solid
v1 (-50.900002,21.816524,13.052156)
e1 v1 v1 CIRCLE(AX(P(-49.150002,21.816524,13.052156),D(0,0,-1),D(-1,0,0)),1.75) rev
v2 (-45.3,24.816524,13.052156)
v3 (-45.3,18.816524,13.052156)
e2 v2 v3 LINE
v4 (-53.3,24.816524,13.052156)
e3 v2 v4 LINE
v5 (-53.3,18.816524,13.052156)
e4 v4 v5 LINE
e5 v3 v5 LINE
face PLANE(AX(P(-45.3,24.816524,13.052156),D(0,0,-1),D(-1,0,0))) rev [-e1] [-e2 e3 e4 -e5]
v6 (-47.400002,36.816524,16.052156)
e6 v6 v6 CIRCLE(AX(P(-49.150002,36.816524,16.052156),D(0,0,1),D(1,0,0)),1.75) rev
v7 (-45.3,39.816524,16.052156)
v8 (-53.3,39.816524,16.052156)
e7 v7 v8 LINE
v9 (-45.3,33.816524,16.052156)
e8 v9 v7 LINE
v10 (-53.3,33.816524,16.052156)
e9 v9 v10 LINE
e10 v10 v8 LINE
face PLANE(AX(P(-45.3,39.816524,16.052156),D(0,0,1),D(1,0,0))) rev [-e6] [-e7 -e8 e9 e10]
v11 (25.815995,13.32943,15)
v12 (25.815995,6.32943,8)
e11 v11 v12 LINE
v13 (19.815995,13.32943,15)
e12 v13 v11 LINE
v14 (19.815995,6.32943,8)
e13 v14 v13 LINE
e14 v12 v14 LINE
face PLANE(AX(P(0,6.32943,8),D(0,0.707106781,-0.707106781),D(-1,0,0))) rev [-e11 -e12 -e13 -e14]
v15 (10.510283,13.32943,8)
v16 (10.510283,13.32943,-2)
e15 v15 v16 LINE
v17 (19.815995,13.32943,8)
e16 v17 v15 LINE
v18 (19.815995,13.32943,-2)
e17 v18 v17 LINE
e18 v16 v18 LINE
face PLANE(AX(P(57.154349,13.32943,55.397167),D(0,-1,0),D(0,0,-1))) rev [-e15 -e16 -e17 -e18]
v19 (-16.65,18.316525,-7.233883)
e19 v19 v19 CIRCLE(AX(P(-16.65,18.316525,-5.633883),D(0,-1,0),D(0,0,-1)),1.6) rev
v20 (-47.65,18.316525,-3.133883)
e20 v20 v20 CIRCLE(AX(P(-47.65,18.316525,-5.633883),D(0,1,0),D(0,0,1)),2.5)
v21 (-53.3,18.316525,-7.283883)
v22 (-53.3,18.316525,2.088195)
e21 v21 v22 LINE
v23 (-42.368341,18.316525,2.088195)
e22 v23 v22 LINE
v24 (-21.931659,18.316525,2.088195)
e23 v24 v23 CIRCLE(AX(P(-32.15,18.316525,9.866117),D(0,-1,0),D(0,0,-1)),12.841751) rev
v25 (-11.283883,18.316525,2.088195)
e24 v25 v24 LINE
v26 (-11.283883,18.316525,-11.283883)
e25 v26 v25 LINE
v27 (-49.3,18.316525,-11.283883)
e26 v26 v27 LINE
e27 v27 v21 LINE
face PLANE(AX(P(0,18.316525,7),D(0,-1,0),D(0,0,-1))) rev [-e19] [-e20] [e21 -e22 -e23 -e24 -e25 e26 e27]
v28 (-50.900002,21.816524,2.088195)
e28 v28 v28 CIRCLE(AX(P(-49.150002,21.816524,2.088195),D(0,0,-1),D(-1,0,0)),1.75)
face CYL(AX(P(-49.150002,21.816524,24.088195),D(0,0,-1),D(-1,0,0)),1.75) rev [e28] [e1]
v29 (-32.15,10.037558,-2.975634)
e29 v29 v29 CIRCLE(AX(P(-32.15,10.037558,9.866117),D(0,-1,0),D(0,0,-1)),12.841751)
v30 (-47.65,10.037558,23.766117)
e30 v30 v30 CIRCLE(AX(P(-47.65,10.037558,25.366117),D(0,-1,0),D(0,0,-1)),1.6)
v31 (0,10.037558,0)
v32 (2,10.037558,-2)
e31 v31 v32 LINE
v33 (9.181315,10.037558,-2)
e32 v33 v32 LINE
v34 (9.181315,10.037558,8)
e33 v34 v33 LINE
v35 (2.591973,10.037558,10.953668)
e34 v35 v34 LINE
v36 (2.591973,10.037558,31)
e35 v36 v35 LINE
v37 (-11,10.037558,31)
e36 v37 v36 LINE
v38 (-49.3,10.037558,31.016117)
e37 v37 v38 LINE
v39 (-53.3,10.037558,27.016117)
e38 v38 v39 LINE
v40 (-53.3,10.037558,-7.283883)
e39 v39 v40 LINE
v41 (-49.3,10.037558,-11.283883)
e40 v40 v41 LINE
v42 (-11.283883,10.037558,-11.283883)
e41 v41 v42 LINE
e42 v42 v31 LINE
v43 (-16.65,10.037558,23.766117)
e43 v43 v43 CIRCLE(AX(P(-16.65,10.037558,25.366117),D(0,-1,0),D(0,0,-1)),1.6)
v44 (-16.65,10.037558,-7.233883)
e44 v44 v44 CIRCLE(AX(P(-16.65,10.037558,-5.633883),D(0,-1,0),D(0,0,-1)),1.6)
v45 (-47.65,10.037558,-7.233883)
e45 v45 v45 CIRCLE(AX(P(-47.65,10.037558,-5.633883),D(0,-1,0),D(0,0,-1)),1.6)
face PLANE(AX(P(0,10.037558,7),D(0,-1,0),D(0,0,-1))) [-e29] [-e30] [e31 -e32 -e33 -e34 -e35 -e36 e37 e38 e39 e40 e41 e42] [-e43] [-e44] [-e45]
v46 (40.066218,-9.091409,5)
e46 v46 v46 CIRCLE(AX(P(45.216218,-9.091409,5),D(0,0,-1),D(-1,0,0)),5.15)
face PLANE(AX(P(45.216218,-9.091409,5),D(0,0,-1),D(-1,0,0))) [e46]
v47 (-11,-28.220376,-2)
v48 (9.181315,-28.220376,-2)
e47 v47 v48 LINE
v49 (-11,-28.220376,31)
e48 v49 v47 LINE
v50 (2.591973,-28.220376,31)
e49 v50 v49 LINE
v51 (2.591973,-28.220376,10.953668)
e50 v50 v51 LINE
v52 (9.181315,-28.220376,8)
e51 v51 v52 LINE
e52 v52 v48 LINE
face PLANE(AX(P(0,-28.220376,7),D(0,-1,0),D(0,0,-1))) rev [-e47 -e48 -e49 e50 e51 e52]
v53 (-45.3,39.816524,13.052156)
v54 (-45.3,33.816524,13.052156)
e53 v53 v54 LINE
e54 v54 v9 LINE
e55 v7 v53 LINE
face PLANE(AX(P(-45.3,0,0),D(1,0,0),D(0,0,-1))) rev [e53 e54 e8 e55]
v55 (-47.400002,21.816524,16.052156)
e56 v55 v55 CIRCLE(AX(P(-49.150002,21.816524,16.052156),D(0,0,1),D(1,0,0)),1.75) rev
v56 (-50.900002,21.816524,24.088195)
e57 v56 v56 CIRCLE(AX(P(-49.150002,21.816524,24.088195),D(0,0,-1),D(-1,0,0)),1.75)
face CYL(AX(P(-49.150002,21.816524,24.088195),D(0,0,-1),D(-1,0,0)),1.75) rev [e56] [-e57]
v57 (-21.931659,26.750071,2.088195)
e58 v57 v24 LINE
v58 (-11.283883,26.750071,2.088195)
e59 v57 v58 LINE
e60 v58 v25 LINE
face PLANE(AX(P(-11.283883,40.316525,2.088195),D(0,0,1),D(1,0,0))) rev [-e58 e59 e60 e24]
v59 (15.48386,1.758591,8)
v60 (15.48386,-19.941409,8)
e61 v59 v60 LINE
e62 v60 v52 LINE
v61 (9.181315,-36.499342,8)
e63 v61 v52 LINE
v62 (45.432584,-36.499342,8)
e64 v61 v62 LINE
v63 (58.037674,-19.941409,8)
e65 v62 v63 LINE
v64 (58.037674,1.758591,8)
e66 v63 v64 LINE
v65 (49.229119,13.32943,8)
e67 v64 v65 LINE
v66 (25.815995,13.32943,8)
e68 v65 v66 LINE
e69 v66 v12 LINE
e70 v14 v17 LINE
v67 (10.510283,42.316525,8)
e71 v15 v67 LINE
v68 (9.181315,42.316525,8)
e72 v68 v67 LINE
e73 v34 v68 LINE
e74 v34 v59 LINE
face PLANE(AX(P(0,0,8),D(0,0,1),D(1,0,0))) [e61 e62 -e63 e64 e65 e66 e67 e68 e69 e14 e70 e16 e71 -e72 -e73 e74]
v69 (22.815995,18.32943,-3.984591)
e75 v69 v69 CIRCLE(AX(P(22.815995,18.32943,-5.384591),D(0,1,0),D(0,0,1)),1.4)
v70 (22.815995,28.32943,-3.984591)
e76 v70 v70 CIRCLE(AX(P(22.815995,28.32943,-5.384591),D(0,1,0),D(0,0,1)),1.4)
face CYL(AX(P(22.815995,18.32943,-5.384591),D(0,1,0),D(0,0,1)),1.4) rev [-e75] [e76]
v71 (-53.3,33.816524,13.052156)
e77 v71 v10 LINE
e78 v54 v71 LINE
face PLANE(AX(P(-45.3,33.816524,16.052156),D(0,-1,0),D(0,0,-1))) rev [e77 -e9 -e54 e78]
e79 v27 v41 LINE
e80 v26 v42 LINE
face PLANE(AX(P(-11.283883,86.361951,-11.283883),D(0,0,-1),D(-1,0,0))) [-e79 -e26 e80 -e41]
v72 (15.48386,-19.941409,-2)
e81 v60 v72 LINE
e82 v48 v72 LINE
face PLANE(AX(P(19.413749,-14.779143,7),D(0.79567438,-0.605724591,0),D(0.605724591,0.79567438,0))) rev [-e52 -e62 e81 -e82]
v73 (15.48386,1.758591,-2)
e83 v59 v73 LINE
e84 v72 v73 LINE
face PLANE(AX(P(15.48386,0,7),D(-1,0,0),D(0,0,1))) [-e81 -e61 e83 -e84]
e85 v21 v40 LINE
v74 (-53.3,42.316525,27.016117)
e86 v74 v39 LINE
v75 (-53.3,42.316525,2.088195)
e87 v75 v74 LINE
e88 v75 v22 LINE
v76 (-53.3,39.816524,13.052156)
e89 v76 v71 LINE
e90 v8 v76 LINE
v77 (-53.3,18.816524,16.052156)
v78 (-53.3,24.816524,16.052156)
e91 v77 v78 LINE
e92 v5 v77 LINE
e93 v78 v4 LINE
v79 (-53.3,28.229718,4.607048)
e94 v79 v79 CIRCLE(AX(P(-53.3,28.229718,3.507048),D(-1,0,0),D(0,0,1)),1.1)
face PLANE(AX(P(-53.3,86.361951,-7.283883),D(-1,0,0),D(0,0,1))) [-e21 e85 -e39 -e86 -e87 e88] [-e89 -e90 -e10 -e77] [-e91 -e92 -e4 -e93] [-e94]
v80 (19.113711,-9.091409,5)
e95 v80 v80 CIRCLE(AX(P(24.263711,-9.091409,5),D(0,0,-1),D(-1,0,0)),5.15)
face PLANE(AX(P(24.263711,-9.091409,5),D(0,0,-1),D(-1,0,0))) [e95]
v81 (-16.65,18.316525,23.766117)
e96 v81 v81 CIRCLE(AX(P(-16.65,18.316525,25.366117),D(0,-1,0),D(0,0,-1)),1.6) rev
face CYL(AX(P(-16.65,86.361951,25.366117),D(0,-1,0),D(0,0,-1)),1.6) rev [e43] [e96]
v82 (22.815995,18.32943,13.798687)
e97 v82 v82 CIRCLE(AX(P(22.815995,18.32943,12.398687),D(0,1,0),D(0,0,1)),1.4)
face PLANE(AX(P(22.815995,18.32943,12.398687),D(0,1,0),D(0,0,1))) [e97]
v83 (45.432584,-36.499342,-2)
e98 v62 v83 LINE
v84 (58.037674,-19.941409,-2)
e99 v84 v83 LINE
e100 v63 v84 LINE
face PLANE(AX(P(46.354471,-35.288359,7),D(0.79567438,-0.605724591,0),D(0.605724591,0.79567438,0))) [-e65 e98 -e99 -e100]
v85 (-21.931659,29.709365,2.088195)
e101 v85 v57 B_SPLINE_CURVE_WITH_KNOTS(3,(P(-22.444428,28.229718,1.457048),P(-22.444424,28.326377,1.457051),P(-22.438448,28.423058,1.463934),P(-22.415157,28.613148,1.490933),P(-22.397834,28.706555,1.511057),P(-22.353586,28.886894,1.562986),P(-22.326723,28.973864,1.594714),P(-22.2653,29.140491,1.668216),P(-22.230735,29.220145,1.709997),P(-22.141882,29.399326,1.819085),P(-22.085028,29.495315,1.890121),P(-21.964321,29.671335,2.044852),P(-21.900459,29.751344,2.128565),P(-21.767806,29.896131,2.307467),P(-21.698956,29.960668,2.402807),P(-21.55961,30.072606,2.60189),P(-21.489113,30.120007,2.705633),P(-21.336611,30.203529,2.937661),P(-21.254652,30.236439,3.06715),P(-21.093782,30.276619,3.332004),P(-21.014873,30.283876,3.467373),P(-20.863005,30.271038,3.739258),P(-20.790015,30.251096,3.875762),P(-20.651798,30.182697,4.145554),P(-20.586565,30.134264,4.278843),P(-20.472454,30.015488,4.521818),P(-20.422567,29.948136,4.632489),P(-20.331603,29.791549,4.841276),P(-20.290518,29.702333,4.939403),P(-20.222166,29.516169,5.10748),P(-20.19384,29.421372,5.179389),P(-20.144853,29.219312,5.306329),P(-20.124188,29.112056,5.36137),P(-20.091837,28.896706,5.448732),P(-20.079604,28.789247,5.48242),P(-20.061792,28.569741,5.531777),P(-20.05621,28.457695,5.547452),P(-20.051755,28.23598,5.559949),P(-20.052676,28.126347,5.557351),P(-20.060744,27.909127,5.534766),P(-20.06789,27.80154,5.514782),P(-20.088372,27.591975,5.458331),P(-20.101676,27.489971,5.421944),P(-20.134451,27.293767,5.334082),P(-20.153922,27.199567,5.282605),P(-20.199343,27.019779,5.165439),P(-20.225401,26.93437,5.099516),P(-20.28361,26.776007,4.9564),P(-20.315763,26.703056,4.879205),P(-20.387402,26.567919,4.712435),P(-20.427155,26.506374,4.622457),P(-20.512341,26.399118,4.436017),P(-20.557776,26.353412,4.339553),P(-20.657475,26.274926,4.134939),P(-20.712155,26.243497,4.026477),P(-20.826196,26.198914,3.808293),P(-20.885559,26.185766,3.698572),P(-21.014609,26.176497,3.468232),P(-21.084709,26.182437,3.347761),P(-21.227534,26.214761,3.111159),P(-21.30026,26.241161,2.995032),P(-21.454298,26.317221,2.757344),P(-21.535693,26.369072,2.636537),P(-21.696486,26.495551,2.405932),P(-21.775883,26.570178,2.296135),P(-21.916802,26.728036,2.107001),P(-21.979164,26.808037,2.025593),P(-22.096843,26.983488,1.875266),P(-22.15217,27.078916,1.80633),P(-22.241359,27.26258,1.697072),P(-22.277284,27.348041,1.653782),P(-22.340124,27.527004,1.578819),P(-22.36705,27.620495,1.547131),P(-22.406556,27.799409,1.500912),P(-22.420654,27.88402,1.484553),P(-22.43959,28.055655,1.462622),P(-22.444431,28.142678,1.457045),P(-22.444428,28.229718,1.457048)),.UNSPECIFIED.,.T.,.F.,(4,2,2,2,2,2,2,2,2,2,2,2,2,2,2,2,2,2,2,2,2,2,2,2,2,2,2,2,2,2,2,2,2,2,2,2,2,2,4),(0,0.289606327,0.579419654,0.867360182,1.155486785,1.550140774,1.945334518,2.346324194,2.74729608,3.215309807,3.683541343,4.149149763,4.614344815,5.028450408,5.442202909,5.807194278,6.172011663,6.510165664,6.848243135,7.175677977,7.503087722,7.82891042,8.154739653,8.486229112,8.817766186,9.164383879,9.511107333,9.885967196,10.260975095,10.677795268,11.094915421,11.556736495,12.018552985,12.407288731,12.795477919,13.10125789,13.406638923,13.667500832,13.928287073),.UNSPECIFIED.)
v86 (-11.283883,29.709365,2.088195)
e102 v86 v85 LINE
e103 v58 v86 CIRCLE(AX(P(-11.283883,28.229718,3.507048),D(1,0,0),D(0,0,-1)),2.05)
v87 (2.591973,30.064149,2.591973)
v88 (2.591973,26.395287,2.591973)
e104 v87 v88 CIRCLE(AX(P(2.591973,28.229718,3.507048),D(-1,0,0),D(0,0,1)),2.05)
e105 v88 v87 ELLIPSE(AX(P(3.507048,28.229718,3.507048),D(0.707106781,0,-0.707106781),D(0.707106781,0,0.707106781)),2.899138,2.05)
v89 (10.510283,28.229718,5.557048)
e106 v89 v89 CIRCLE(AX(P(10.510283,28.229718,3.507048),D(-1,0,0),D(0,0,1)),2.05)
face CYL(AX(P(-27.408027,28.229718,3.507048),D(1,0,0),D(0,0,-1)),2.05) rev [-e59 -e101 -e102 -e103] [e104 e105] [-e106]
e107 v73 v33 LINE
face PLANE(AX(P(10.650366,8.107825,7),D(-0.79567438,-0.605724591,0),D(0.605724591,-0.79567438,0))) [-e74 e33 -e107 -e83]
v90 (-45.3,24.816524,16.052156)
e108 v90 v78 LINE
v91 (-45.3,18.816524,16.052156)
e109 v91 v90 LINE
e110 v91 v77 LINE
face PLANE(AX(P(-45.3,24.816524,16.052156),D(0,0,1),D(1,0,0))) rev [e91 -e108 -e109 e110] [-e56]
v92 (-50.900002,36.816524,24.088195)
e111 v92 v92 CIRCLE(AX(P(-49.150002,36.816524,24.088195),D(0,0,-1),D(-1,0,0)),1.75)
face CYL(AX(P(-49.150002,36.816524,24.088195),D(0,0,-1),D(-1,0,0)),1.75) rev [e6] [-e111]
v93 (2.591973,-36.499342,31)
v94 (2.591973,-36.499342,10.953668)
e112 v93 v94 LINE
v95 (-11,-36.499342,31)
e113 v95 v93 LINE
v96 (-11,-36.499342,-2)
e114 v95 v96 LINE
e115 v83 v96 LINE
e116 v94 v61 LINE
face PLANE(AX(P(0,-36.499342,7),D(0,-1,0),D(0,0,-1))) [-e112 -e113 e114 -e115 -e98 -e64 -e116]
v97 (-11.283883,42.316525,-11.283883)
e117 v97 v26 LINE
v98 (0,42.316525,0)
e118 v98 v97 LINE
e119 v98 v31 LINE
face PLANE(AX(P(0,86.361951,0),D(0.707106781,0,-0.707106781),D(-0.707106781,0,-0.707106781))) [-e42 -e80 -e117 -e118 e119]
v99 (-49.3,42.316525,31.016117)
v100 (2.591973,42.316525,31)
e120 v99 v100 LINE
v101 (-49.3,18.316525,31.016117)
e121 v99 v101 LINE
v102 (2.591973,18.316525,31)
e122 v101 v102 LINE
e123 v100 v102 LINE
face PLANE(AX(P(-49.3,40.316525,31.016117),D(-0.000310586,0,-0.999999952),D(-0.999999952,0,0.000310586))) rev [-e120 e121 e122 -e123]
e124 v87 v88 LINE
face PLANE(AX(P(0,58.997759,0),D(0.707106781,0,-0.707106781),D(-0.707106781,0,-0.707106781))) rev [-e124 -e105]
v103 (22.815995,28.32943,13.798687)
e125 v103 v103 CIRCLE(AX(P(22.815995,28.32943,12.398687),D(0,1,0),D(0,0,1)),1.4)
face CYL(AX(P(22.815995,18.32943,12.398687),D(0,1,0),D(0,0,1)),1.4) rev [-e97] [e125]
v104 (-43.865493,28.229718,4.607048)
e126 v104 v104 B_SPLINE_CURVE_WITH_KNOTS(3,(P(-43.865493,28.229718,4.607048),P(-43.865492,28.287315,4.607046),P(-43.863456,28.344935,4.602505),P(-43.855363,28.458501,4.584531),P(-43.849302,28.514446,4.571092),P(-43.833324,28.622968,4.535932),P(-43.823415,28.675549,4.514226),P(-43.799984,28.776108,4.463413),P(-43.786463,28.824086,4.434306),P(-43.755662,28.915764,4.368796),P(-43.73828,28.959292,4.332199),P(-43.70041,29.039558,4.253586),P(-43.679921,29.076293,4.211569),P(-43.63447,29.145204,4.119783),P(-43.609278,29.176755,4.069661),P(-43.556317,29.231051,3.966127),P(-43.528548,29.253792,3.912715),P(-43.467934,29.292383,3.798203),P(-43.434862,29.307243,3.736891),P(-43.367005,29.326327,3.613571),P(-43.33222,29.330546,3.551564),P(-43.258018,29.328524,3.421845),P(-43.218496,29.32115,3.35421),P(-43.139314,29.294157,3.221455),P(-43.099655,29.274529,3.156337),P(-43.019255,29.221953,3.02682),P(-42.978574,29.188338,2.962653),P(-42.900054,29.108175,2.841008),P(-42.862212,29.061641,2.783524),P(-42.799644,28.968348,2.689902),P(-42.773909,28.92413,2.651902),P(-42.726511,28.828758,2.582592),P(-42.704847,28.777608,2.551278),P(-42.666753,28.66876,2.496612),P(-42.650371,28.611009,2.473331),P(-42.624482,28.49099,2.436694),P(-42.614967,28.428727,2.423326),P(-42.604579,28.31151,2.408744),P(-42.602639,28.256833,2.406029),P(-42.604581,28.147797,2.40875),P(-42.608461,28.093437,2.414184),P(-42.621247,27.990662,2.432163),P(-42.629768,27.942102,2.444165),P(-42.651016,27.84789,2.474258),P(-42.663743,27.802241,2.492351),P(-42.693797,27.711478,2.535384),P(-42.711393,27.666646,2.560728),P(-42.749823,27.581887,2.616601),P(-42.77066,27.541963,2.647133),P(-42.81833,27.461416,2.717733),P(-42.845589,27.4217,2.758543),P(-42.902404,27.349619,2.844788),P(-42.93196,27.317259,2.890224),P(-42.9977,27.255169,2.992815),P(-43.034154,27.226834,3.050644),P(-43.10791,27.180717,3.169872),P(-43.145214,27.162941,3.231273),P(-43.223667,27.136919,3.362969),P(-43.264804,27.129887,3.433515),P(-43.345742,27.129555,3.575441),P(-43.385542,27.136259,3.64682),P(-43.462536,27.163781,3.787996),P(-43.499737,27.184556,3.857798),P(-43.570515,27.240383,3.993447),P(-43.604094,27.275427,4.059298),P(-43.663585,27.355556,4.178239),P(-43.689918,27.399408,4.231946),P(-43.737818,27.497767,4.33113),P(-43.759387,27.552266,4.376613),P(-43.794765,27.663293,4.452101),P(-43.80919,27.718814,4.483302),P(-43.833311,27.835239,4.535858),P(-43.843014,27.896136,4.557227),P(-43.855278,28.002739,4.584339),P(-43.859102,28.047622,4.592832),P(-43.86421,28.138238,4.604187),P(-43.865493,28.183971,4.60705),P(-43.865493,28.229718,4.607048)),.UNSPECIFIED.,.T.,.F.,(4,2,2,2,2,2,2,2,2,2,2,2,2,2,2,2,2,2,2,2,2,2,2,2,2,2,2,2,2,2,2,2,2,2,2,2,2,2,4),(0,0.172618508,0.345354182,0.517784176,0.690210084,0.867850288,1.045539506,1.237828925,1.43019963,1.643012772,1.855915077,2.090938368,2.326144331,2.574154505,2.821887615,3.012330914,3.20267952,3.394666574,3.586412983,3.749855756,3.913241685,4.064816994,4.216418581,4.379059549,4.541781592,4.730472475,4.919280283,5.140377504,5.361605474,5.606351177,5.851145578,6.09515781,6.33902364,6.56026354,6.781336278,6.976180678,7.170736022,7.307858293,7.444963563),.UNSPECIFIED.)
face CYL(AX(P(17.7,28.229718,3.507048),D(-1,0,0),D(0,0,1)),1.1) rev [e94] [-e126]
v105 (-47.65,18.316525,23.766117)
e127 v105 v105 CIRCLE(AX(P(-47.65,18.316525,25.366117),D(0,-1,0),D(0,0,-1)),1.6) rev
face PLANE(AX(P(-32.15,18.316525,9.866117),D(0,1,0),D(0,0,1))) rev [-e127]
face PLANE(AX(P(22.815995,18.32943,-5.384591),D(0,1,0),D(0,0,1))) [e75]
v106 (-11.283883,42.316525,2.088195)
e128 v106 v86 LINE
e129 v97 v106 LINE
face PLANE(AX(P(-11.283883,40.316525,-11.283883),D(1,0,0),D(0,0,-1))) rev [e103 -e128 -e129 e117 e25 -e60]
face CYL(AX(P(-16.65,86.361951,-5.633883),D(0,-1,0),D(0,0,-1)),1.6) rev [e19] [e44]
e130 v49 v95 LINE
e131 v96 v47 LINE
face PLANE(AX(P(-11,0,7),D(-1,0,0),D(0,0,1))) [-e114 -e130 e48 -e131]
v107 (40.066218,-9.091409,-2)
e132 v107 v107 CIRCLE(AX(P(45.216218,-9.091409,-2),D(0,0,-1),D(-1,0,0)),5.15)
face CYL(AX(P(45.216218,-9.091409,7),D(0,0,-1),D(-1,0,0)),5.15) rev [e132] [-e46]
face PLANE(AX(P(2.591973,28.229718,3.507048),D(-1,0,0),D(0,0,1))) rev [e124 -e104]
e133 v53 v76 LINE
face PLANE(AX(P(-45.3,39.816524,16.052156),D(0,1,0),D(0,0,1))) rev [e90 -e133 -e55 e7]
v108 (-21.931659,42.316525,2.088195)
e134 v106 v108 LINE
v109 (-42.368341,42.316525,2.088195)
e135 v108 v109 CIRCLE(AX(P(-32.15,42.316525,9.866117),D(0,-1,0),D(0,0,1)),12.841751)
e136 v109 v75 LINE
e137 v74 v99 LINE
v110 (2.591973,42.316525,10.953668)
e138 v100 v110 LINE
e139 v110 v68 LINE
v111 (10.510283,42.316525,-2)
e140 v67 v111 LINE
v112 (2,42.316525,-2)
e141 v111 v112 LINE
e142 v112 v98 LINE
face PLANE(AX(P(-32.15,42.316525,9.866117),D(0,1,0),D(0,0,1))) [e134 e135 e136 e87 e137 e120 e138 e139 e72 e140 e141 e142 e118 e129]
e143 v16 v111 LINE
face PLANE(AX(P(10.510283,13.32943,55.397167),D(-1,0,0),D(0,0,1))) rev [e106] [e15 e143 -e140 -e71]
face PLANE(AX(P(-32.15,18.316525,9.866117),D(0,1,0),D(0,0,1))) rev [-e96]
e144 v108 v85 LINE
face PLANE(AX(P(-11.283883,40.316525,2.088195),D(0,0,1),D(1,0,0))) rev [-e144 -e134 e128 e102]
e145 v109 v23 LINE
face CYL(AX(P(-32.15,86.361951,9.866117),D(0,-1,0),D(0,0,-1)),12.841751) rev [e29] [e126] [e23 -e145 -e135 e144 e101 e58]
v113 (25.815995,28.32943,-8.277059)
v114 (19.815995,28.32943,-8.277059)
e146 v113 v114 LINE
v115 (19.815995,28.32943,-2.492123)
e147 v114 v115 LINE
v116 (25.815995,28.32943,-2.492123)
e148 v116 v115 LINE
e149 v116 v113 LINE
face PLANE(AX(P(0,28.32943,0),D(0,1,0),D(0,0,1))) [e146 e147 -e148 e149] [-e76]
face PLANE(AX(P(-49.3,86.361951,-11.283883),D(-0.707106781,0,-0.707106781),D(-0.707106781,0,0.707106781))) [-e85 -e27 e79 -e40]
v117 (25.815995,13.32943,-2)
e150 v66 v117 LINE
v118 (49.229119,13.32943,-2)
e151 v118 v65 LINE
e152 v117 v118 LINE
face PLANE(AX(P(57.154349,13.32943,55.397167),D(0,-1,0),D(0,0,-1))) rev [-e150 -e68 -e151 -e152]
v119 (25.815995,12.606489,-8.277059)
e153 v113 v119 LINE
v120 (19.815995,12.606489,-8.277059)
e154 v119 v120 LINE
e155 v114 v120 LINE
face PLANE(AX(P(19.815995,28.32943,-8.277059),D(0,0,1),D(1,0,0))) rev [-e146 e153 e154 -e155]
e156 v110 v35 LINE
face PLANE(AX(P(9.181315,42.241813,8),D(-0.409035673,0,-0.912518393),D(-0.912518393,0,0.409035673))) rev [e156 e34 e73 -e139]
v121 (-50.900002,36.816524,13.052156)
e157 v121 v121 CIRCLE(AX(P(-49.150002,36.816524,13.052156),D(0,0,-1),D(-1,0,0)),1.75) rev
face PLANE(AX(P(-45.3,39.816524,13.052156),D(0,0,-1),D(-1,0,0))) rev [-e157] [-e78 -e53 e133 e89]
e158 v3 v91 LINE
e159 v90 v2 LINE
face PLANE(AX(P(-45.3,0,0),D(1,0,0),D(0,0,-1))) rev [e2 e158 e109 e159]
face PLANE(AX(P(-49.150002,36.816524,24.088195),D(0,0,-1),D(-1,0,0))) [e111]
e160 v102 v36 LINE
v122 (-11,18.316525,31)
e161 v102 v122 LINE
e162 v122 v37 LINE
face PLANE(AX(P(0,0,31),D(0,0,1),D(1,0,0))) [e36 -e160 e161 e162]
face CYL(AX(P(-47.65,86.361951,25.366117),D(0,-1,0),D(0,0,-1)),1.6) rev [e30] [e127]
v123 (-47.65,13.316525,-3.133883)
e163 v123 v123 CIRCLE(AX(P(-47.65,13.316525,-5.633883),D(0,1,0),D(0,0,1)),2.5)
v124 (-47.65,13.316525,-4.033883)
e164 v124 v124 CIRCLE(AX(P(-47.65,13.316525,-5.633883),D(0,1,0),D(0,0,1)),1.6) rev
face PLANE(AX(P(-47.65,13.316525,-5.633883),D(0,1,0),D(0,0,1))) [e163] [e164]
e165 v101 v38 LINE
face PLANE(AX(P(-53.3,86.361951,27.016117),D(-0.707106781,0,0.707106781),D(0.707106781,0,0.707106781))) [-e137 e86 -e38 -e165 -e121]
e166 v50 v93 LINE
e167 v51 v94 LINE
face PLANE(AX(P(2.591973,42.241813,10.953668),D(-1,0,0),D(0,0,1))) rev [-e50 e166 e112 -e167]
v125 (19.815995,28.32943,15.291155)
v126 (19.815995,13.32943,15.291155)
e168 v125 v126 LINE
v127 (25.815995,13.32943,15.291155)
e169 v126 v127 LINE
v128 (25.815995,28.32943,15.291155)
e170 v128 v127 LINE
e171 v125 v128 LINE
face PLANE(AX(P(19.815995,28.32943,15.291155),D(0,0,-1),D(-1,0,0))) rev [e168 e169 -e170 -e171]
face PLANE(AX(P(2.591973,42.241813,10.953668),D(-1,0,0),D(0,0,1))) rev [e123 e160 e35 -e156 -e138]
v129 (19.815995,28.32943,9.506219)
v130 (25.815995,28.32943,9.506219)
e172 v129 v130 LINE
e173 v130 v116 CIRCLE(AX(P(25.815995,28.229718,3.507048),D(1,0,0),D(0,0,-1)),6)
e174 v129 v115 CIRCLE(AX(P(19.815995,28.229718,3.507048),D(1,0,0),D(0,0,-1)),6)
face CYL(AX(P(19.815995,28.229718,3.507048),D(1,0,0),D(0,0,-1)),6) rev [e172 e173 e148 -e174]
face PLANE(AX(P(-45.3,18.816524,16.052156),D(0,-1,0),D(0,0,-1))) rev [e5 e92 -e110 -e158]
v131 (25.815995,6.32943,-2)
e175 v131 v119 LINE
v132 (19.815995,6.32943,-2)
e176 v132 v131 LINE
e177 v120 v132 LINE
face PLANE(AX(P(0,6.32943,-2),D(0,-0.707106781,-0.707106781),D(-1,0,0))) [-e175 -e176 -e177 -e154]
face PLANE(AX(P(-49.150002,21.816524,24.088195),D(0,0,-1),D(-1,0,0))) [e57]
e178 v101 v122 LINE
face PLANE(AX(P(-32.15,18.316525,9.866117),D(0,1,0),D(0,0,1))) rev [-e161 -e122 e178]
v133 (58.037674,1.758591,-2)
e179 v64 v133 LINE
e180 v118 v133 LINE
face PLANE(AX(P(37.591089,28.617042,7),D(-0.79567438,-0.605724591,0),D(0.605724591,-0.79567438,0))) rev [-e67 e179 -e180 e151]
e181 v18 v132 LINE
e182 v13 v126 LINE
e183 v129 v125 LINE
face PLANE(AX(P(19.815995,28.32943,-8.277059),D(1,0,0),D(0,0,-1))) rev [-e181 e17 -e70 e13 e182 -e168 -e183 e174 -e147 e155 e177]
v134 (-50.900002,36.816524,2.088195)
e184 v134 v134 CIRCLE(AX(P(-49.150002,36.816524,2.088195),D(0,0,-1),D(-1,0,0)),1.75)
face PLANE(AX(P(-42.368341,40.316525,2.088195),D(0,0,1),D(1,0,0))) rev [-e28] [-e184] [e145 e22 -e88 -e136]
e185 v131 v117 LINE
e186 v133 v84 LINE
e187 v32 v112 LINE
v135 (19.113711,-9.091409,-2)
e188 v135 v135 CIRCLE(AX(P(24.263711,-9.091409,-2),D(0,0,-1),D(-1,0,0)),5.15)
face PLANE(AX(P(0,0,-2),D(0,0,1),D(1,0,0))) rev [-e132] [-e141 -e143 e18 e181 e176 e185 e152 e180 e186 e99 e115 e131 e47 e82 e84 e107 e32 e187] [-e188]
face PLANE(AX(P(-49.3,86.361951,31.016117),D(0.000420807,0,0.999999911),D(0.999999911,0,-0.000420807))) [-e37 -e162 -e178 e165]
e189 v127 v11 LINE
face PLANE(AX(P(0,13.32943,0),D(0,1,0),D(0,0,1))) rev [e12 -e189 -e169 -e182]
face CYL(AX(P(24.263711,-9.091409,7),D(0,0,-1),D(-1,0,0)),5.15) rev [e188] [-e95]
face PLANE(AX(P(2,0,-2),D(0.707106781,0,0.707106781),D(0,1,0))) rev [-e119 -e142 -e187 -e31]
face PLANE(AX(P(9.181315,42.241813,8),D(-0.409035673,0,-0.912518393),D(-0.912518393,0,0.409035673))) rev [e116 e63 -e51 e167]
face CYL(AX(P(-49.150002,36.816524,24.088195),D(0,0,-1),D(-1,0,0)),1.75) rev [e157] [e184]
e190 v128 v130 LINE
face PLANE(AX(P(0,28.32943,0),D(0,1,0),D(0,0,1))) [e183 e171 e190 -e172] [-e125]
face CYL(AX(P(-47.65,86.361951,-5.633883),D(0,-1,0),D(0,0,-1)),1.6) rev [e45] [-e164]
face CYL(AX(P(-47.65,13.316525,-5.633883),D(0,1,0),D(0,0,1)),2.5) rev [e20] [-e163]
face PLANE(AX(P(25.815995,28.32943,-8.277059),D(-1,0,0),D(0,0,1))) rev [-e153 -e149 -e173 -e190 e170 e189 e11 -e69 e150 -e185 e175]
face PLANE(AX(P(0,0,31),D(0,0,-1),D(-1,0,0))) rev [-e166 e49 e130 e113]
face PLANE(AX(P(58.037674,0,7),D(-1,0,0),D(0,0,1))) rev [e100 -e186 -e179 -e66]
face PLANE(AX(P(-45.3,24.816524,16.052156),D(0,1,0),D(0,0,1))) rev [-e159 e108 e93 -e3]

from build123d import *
from build123d.topology import SkipClean

# Parameters (mm, degrees)
SKICA1_R                  = 5.15
P_IDAT_VYSUNUT_M1_DEPTH   = 7
P_IDAT_VYSUNUT_M6_DEPTH   = 1
SKICA10_W                 = 20.181315219
SKICA10_H                 = 8.27896674
P_IDAT_VYSUNUT_M7_DEPTH   = 23
ODEBRAT_START             = -54.815867
ODEBRAT_VYSUNUT_M3_DEPTH  = 54.815867
SKICA12_R                 = 12.841751151
SKICA12_R_2               = 1.6
P_IDAT_VYSUNUT_M8_DEPTH   = 8.27896674
SKICA13_R                 = 2.5
ODEBRAT_VYSUNUT_M4_DEPTH  = 5
P_IDAT_VYSUNUT_M9_DEPTH   = 22
SKICA15_R                 = 1.749999821
ODEBRAT_VYSUNUT_M5_DEPTH  = 22
SKICA18_W                 = 3
SKICA18_H                 = 6
ODEBRAT_VYSUNUT_M6_DEPTH  = 8
P_IDAT_VYSUNUT_M10_DEPTH  = 2
SKICA20_R                 = 1.1
ODEBRAT_VYSUNUT_M7_DEPTH  = 51
SKICA21_R                 = 2.05
ODEBRAT_VYSUNUT_M8_DEPTH  = 30
P_IDAT_START              = 2
SKICA22_R                 = 5.15
P_IDAT_VYSUNUT_M11_DEPTH  = 2
SKICA23_R                 = 5.15
P_IDAT_VYSUNUT_M12_DEPTH  = 2
ZKOSEN_1_SIZE             = 2
SKICA24_W                 = 46.644065318
SKICA24_H                 = 8.415614868
ODEBRAT_VYSUNUT_M9_DEPTH  = 10
P_IDAT_VYSUNUT_M13_DEPTH  = 24
SKICA26_W                 = 6
SKICA26_H                 = 23.568213348
P_IDAT_VYSUNUT_M14_DEPTH  = 15
SKICA27_R                 = 6
ODEBRAT_VYSUNUT_M10_DEPTH = 6
ZKOSEN_2_SIZE             = 7
SKICA28_R                 = 1.4
ODEBRAT_VYSUNUT_M11_DEPTH = 10
ODEBRAT_START_2           = -10
SKICA29_R                 = 2.05
ODEBRAT_VYSUNUT_M12_DEPTH = 10


# Some blends are built 0.0001 mm under size
with BuildPart() as part:
    # Skica1 → Přidat vysunutím1 (new body)
    with BuildSketch(Plane.XY):
        Polygon((15.483860416, -19.94140889), (15.483860416, 1.75859111), (9.181315219, 10.03755785), (-11, 10.03755785), (-11, 18.31652459), (2.878770021, 18.31652459), (45.432583607, 18.31652459), (58.037674001, 1.75859111), (58.037674001, -19.94140889), (45.432583607, -36.49934237), (2.878770021, -36.49934237), (-11, -36.49934237), (-11, -28.22037563), (9.181315219, -28.22037563), align=None)
        with Locations((45.216218307, -9.09140889)):
            Circle(SKICA1_R, mode=Mode.SUBTRACT)
        with Locations((24.263711451, -9.09140889)):
            Circle(SKICA1_R, mode=Mode.SUBTRACT)
    extrude(amount=P_IDAT_VYSUNUT_M1_DEPTH)

    # Skica9 → Přidat vysunutím6 (add)
    with BuildSketch(Plane.XY.offset(7)):
        Polygon((45.432583607, -36.49934237), (58.037674001, -19.94140889), (58.037674001, 1.75859111), (45.432583607, 18.31652459), (-11, 18.31652459), (-11, 10.03755785), (9.181315219, 10.03755785), (15.483860416, 1.75859111), (15.483860416, -19.94140889), (9.181315219, -28.22037563), (-11, -28.22037563), (-11, -36.49934237), align=None)
    extrude(amount=P_IDAT_VYSUNUT_M6_DEPTH)

    # Skica10 → Přidat vysunutím7 (add)
    with BuildSketch(Plane.XY.offset(8)):
        with Locations((-0.90934239, -32.359859)):
            Rectangle(SKICA10_W, SKICA10_H)
        with Locations((-0.90934239, 14.17704122)):
            Rectangle(SKICA10_W, SKICA10_H)
    extrude(amount=P_IDAT_VYSUNUT_M7_DEPTH)

    # Skica11 → Odebrat vysunutím3 (cut)
    with BuildSketch(Plane.XZ.offset(36.49934237).offset(ODEBRAT_START)):
        Polygon((9.181315219, 8), (2.591972534, 10.953667824), (2.591972534, 31), (9.181315219, 31), align=None)
    extrude(amount=ODEBRAT_VYSUNUT_M3_DEPTH, mode=Mode.SUBTRACT)

    # Skica12 → Přidat vysunutím8 (add)
    with BuildSketch(Plane.XZ.offset(-10.03755785)):
        Polygon((0, 0), (-11.283883078, -11.283883078), (-49.3, -11.283883078), (-53.3, -7.283883078), (-53.3, 27.016116922), (-49.3, 31.016116922), (-11, 31), (-11, 0), align=None)
        with Locations(Location((-32.15, 9.866116922, 0), (0, 0, 270))):
            Circle(SKICA12_R, mode=Mode.SUBTRACT)
        with Locations(Location((-47.65, 25.366116922, 0), (0, 0, 270))):
            Circle(SKICA12_R_2, mode=Mode.SUBTRACT)
        with Locations(Location((-16.65, 25.366116922, 0), (0, 0, 270))):
            Circle(SKICA12_R_2, mode=Mode.SUBTRACT)
        with Locations(Location((-16.65, -5.633883078, 0), (0, 0, 270))):
            Circle(SKICA12_R_2, mode=Mode.SUBTRACT)
        with Locations(Location((-47.65, -5.633883078, 0), (0, 0, 270))):
            Circle(SKICA12_R_2, mode=Mode.SUBTRACT)
    extrude(amount=-P_IDAT_VYSUNUT_M8_DEPTH)

    # Skica13 → Odebrat vysunutím4 (cut)
    with BuildSketch(Plane(origin=(0, 18.31652459, 0), x_dir=(1, 0, 0), z_dir=(0, 1, 0))):
        with Locations(Location((-47.65, 5.633883078, 0), (0, 0, 270))):
            Circle(SKICA13_R)
    extrude(amount=-ODEBRAT_VYSUNUT_M4_DEPTH, mode=Mode.SUBTRACT)

    # Skica14 → Přidat vysunutím9 (add)
    with BuildSketch(Plane(origin=(0, 18.31652459, 0), x_dir=(1, 0, 0), z_dir=(0, 1, 0))):
        with BuildLine():
            Line((-42.368341227, -2.088194628), (-53.3, -2.088194628))
            Line((-53.3, -2.088194628), (-53.3, -27.016116922))
            Line((-53.3, -27.016116922), (-49.3, -31.016116922))
            Line((-49.3, -31.016116922), (2.591972534, -31))
            Line((2.591972534, -31), (2.591972534, -10.953667824))
            Line((2.591972534, -10.953667824), (2.591972534, -2.591972534))
            Line((2.591972534, -2.591972534), (-11.283883078, 11.283883078))
            Line((-11.283883078, 11.283883078), (-11.283883078, -2.088194628))
            Line((-11.283883078, -2.088194628), (-21.931658773, -2.088194628))
            ThreePointArc((-21.931658773, -2.088194628), (-32.15, -22.707868073), (-42.368341227, -2.088194628))
        make_face()
    extrude(amount=P_IDAT_VYSUNUT_M9_DEPTH)

    # Skica15 → Odebrat vysunutím5 (cut)
    with BuildSketch(Plane(origin=(0, 0, 2.088194628), x_dir=(-1, 0, 0), z_dir=(0, 0, -1))):
        with Locations((49.150002214, 36.816524362)):
            Circle(SKICA15_R)
        with Locations((49.150002214, 21.816524232)):
            Circle(SKICA15_R)
    extrude(amount=-ODEBRAT_VYSUNUT_M5_DEPTH, mode=Mode.SUBTRACT)

    # Skica18 → Odebrat vysunutím6 (cut)
    with BuildSketch(Plane.ZY.offset(53.3)):
        with Locations((14.552155775, 36.816524362)):
            Rectangle(SKICA18_W, SKICA18_H)
        with Locations((14.552155775, 21.816524232)):
            Rectangle(SKICA18_W, SKICA18_H)
    extrude(amount=-ODEBRAT_VYSUNUT_M6_DEPTH, mode=Mode.SUBTRACT)

    # Skica19 → Přidat vysunutím10 (add)
    with BuildSketch(Plane(origin=(0, 40.31652459, 0), x_dir=(1, 0, 0), z_dir=(0, 1, 0))):
        with BuildLine():
            Line((-42.368341227, -2.088194628), (-53.3, -2.088194628))
            Line((-53.3, -2.088194628), (-53.3, -27.016116922))
            Line((-53.3, -27.016116922), (-49.3, -31.016116922))
            Line((-49.3, -31.016116922), (2.591972534, -31))
            Line((2.591972534, -31), (2.591972534, -2.591972534))
            Line((2.591972534, -2.591972534), (-11.283883078, 11.283883078))
            Line((-11.283883078, 11.283883078), (-11.283883078, -2.088194628))
            Line((-11.283883078, -2.088194628), (-21.931658773, -2.088194628))
            ThreePointArc((-21.931658773, -2.088194628), (-32.15, -22.707868073), (-42.368341227, -2.088194628))
        make_face()
    extrude(amount=P_IDAT_VYSUNUT_M10_DEPTH)

    # Skica20 → Odebrat vysunutím7 (cut, symmetric)
    with BuildSketch(Plane.ZY.offset(33.3)):
        with Locations((3.507048003, 28.229718278)):
            Circle(SKICA20_R)
    extrude(amount=ODEBRAT_VYSUNUT_M7_DEPTH, both=True, mode=Mode.SUBTRACT)

    # Skica21 → Odebrat vysunutím8 (cut)
    with BuildSketch(Plane(origin=(2.591972534, 0, 0), x_dir=(0, 0, -1), z_dir=(1, 0, 0))):
        with Locations(Location((-3.507048003, 28.229718278, 0), (0, 0, 313.798445967))):
            Circle(SKICA21_R)
    extrude(amount=-ODEBRAT_VYSUNUT_M8_DEPTH, mode=Mode.SUBTRACT)

    # Skica22 → Přidat vysunutím11 (add)
    with BuildSketch(Plane(origin=(0, 0, 0), x_dir=(-1, 0, 0), z_dir=(0, 0, -1)).offset(P_IDAT_START)):
        Polygon((-9.181315219, 10.03755785), (0, 10.03755785), (0, 18.31652459), (-45.432583607, 18.31652459), (-58.037674001, 1.75859111), (-58.037674001, -19.94140889), (-45.432583607, -36.49934237), (11, -36.49934237), (11, -28.22037563), (-9.181315219, -28.22037563), (-15.483860416, -19.94140889), (-15.483860416, 1.75859111), align=None)
        with Locations((-45.216218307, -9.09140889)):
            Circle(SKICA22_R, mode=Mode.SUBTRACT)
        with Locations((-24.263711451, -9.09140889)):
            Circle(SKICA22_R, mode=Mode.SUBTRACT)
    extrude(amount=-P_IDAT_VYSUNUT_M11_DEPTH)

    # Skica23 → Přidat vysunutím12 (add)
    with BuildSketch(Plane(origin=(0, 0, 7), x_dir=(-1, 0, 0), z_dir=(0, 0, -1)).offset(P_IDAT_START)):
        with Locations((-45.216218307, -9.09140889)):
            Circle(SKICA23_R)
        with Locations((-24.263711451, -9.09140889)):
            Circle(SKICA23_R)
    extrude(amount=-P_IDAT_VYSUNUT_M12_DEPTH)

    # Zkosení1
    zkosen_1_edges = [part.edges().sort_by_distance(p)[0] for p in [
        (0, 14.17704122, -2),
    ]]
    chamfer(zkosen_1_edges, length=ZKOSEN_1_SIZE - 0.0001)  # a hair under: the kernel refuses the full size

    # Skica24 → Odebrat vysunutím9 (cut)
    with BuildSketch(Plane(origin=(0, 0, -2), x_dir=(-1, 0, 0), z_dir=(0, 0, -1))):
        with Locations((-33.832316059, 17.537237537)):
            Rectangle(SKICA24_W, SKICA24_H)
    extrude(amount=-ODEBRAT_VYSUNUT_M9_DEPTH, mode=Mode.SUBTRACT)

    # Skica25 → Přidat vysunutím13 (add)
    with SkipClean():  # the faces are left unmerged after this step: merging them gives an invalid solid
        with BuildSketch(Plane(origin=(0, 18.31652459, 0), x_dir=(1, 0, 0), z_dir=(0, 1, 0))):
            Polygon((9.181315219, -8), (10.5102834, -8), (10.5102834, 2), (2, 2), (0, 0), (2.591972534, -2.591972534), (2.591972534, -10.953667824), align=None)
        extrude(amount=P_IDAT_VYSUNUT_M13_DEPTH)

    # Skica26 → Přidat vysunutím14 (add)
    with SkipClean():  # the faces are left unmerged after this step: merging them gives an invalid solid
        with BuildSketch(Plane(origin=(0, 13.329430103, 0), x_dir=(1, 0, 0), z_dir=(0, 1, 0))):
            with Locations((22.815994553, -3.507048003)):
                Rectangle(SKICA26_W, SKICA26_H)
        extrude(amount=P_IDAT_VYSUNUT_M14_DEPTH)

    # Skica27 → Odebrat vysunutím10 (cut)
    with SkipClean():  # the faces are left unmerged after this step: merging them gives an invalid solid
        with BuildSketch(Plane(origin=(25.815994553, 0, 0), x_dir=(0, 0, -1), z_dir=(1, 0, 0))):
            with Locations((-3.507048003, 28.229718278)):
                Circle(SKICA27_R)
        extrude(amount=-ODEBRAT_VYSUNUT_M10_DEPTH, mode=Mode.SUBTRACT)

    # Zkosení2
    # the kernel refuses this chamfer: 7 mm, written as the material it adds along each edge
    with BuildSketch(Plane(origin=(25.815994553, 13.329430103, 8), x_dir=(0, -0.9996219169112968, -0.027495876610586365), z_dir=(-1, 0, 0))) as zkosen_2_piece_1:
        Polygon((ZKOSEN_2_SIZE * 0.999621916911, ZKOSEN_2_SIZE * 0.0274958766106), (-ZKOSEN_2_SIZE * 0.0274958766106, ZKOSEN_2_SIZE * 0.999621916911), (0, 0), align=None)
    extrude(amount=6)
    with BuildSketch(Plane(origin=(25.815994553, 13.329430103, -2), x_dir=(0, -0.9996219169112968, 0.027495876610586358), z_dir=(-1, 0, 0))) as zkosen_2_piece_2_section:
        Polygon((ZKOSEN_2_SIZE * 0.999621916911, -ZKOSEN_2_SIZE * 0.0274958766106), (-ZKOSEN_2_SIZE * 0.0274958766106, -ZKOSEN_2_SIZE * 0.999621916911), (0, 0), align=None)
    zkosen_2_piece_2 = extrude(amount=6, mode=Mode.PRIVATE)
    zkosen_2_piece_2 = split(zkosen_2_piece_2, bisect_by=Plane(origin=(22.815994553, 8.801515267, -8.277058671), z_dir=(0, 0, 1)), keep=Keep.TOP, mode=Mode.PRIVATE)
    add(zkosen_2_piece_2)

    # Skica28 → Odebrat vysunutím11 (cut)
    with SkipClean():  # the faces are left unmerged after this step: merging them gives an invalid solid
        with BuildSketch(Plane(origin=(0, 28.329430103, 0), x_dir=(1, 0, 0), z_dir=(0, 1, 0))):
            with Locations(Location((22.815994553, -12.398687042, 0), (0, 0, 270))):
                Circle(SKICA28_R)
            with Locations(Location((22.815994553, 5.384591037, 0), (0, 0, 270))):
                Circle(SKICA28_R)
        extrude(amount=-ODEBRAT_VYSUNUT_M11_DEPTH, mode=Mode.SUBTRACT)

    # Skica29 → Odebrat vysunutím12 (cut)
    with SkipClean():  # the faces are left unmerged after this step: merging them gives an invalid solid
        with BuildSketch(Plane.ZY.offset(-2.591972534).offset(ODEBRAT_START_2)):
            with Locations(Location((3.507048003, 28.229718278, 0), (0, 0, 226.201554033))):
                Circle(SKICA29_R)
        extrude(amount=ODEBRAT_VYSUNUT_M12_DEPTH, mode=Mode.SUBTRACT)


solid = part.part
